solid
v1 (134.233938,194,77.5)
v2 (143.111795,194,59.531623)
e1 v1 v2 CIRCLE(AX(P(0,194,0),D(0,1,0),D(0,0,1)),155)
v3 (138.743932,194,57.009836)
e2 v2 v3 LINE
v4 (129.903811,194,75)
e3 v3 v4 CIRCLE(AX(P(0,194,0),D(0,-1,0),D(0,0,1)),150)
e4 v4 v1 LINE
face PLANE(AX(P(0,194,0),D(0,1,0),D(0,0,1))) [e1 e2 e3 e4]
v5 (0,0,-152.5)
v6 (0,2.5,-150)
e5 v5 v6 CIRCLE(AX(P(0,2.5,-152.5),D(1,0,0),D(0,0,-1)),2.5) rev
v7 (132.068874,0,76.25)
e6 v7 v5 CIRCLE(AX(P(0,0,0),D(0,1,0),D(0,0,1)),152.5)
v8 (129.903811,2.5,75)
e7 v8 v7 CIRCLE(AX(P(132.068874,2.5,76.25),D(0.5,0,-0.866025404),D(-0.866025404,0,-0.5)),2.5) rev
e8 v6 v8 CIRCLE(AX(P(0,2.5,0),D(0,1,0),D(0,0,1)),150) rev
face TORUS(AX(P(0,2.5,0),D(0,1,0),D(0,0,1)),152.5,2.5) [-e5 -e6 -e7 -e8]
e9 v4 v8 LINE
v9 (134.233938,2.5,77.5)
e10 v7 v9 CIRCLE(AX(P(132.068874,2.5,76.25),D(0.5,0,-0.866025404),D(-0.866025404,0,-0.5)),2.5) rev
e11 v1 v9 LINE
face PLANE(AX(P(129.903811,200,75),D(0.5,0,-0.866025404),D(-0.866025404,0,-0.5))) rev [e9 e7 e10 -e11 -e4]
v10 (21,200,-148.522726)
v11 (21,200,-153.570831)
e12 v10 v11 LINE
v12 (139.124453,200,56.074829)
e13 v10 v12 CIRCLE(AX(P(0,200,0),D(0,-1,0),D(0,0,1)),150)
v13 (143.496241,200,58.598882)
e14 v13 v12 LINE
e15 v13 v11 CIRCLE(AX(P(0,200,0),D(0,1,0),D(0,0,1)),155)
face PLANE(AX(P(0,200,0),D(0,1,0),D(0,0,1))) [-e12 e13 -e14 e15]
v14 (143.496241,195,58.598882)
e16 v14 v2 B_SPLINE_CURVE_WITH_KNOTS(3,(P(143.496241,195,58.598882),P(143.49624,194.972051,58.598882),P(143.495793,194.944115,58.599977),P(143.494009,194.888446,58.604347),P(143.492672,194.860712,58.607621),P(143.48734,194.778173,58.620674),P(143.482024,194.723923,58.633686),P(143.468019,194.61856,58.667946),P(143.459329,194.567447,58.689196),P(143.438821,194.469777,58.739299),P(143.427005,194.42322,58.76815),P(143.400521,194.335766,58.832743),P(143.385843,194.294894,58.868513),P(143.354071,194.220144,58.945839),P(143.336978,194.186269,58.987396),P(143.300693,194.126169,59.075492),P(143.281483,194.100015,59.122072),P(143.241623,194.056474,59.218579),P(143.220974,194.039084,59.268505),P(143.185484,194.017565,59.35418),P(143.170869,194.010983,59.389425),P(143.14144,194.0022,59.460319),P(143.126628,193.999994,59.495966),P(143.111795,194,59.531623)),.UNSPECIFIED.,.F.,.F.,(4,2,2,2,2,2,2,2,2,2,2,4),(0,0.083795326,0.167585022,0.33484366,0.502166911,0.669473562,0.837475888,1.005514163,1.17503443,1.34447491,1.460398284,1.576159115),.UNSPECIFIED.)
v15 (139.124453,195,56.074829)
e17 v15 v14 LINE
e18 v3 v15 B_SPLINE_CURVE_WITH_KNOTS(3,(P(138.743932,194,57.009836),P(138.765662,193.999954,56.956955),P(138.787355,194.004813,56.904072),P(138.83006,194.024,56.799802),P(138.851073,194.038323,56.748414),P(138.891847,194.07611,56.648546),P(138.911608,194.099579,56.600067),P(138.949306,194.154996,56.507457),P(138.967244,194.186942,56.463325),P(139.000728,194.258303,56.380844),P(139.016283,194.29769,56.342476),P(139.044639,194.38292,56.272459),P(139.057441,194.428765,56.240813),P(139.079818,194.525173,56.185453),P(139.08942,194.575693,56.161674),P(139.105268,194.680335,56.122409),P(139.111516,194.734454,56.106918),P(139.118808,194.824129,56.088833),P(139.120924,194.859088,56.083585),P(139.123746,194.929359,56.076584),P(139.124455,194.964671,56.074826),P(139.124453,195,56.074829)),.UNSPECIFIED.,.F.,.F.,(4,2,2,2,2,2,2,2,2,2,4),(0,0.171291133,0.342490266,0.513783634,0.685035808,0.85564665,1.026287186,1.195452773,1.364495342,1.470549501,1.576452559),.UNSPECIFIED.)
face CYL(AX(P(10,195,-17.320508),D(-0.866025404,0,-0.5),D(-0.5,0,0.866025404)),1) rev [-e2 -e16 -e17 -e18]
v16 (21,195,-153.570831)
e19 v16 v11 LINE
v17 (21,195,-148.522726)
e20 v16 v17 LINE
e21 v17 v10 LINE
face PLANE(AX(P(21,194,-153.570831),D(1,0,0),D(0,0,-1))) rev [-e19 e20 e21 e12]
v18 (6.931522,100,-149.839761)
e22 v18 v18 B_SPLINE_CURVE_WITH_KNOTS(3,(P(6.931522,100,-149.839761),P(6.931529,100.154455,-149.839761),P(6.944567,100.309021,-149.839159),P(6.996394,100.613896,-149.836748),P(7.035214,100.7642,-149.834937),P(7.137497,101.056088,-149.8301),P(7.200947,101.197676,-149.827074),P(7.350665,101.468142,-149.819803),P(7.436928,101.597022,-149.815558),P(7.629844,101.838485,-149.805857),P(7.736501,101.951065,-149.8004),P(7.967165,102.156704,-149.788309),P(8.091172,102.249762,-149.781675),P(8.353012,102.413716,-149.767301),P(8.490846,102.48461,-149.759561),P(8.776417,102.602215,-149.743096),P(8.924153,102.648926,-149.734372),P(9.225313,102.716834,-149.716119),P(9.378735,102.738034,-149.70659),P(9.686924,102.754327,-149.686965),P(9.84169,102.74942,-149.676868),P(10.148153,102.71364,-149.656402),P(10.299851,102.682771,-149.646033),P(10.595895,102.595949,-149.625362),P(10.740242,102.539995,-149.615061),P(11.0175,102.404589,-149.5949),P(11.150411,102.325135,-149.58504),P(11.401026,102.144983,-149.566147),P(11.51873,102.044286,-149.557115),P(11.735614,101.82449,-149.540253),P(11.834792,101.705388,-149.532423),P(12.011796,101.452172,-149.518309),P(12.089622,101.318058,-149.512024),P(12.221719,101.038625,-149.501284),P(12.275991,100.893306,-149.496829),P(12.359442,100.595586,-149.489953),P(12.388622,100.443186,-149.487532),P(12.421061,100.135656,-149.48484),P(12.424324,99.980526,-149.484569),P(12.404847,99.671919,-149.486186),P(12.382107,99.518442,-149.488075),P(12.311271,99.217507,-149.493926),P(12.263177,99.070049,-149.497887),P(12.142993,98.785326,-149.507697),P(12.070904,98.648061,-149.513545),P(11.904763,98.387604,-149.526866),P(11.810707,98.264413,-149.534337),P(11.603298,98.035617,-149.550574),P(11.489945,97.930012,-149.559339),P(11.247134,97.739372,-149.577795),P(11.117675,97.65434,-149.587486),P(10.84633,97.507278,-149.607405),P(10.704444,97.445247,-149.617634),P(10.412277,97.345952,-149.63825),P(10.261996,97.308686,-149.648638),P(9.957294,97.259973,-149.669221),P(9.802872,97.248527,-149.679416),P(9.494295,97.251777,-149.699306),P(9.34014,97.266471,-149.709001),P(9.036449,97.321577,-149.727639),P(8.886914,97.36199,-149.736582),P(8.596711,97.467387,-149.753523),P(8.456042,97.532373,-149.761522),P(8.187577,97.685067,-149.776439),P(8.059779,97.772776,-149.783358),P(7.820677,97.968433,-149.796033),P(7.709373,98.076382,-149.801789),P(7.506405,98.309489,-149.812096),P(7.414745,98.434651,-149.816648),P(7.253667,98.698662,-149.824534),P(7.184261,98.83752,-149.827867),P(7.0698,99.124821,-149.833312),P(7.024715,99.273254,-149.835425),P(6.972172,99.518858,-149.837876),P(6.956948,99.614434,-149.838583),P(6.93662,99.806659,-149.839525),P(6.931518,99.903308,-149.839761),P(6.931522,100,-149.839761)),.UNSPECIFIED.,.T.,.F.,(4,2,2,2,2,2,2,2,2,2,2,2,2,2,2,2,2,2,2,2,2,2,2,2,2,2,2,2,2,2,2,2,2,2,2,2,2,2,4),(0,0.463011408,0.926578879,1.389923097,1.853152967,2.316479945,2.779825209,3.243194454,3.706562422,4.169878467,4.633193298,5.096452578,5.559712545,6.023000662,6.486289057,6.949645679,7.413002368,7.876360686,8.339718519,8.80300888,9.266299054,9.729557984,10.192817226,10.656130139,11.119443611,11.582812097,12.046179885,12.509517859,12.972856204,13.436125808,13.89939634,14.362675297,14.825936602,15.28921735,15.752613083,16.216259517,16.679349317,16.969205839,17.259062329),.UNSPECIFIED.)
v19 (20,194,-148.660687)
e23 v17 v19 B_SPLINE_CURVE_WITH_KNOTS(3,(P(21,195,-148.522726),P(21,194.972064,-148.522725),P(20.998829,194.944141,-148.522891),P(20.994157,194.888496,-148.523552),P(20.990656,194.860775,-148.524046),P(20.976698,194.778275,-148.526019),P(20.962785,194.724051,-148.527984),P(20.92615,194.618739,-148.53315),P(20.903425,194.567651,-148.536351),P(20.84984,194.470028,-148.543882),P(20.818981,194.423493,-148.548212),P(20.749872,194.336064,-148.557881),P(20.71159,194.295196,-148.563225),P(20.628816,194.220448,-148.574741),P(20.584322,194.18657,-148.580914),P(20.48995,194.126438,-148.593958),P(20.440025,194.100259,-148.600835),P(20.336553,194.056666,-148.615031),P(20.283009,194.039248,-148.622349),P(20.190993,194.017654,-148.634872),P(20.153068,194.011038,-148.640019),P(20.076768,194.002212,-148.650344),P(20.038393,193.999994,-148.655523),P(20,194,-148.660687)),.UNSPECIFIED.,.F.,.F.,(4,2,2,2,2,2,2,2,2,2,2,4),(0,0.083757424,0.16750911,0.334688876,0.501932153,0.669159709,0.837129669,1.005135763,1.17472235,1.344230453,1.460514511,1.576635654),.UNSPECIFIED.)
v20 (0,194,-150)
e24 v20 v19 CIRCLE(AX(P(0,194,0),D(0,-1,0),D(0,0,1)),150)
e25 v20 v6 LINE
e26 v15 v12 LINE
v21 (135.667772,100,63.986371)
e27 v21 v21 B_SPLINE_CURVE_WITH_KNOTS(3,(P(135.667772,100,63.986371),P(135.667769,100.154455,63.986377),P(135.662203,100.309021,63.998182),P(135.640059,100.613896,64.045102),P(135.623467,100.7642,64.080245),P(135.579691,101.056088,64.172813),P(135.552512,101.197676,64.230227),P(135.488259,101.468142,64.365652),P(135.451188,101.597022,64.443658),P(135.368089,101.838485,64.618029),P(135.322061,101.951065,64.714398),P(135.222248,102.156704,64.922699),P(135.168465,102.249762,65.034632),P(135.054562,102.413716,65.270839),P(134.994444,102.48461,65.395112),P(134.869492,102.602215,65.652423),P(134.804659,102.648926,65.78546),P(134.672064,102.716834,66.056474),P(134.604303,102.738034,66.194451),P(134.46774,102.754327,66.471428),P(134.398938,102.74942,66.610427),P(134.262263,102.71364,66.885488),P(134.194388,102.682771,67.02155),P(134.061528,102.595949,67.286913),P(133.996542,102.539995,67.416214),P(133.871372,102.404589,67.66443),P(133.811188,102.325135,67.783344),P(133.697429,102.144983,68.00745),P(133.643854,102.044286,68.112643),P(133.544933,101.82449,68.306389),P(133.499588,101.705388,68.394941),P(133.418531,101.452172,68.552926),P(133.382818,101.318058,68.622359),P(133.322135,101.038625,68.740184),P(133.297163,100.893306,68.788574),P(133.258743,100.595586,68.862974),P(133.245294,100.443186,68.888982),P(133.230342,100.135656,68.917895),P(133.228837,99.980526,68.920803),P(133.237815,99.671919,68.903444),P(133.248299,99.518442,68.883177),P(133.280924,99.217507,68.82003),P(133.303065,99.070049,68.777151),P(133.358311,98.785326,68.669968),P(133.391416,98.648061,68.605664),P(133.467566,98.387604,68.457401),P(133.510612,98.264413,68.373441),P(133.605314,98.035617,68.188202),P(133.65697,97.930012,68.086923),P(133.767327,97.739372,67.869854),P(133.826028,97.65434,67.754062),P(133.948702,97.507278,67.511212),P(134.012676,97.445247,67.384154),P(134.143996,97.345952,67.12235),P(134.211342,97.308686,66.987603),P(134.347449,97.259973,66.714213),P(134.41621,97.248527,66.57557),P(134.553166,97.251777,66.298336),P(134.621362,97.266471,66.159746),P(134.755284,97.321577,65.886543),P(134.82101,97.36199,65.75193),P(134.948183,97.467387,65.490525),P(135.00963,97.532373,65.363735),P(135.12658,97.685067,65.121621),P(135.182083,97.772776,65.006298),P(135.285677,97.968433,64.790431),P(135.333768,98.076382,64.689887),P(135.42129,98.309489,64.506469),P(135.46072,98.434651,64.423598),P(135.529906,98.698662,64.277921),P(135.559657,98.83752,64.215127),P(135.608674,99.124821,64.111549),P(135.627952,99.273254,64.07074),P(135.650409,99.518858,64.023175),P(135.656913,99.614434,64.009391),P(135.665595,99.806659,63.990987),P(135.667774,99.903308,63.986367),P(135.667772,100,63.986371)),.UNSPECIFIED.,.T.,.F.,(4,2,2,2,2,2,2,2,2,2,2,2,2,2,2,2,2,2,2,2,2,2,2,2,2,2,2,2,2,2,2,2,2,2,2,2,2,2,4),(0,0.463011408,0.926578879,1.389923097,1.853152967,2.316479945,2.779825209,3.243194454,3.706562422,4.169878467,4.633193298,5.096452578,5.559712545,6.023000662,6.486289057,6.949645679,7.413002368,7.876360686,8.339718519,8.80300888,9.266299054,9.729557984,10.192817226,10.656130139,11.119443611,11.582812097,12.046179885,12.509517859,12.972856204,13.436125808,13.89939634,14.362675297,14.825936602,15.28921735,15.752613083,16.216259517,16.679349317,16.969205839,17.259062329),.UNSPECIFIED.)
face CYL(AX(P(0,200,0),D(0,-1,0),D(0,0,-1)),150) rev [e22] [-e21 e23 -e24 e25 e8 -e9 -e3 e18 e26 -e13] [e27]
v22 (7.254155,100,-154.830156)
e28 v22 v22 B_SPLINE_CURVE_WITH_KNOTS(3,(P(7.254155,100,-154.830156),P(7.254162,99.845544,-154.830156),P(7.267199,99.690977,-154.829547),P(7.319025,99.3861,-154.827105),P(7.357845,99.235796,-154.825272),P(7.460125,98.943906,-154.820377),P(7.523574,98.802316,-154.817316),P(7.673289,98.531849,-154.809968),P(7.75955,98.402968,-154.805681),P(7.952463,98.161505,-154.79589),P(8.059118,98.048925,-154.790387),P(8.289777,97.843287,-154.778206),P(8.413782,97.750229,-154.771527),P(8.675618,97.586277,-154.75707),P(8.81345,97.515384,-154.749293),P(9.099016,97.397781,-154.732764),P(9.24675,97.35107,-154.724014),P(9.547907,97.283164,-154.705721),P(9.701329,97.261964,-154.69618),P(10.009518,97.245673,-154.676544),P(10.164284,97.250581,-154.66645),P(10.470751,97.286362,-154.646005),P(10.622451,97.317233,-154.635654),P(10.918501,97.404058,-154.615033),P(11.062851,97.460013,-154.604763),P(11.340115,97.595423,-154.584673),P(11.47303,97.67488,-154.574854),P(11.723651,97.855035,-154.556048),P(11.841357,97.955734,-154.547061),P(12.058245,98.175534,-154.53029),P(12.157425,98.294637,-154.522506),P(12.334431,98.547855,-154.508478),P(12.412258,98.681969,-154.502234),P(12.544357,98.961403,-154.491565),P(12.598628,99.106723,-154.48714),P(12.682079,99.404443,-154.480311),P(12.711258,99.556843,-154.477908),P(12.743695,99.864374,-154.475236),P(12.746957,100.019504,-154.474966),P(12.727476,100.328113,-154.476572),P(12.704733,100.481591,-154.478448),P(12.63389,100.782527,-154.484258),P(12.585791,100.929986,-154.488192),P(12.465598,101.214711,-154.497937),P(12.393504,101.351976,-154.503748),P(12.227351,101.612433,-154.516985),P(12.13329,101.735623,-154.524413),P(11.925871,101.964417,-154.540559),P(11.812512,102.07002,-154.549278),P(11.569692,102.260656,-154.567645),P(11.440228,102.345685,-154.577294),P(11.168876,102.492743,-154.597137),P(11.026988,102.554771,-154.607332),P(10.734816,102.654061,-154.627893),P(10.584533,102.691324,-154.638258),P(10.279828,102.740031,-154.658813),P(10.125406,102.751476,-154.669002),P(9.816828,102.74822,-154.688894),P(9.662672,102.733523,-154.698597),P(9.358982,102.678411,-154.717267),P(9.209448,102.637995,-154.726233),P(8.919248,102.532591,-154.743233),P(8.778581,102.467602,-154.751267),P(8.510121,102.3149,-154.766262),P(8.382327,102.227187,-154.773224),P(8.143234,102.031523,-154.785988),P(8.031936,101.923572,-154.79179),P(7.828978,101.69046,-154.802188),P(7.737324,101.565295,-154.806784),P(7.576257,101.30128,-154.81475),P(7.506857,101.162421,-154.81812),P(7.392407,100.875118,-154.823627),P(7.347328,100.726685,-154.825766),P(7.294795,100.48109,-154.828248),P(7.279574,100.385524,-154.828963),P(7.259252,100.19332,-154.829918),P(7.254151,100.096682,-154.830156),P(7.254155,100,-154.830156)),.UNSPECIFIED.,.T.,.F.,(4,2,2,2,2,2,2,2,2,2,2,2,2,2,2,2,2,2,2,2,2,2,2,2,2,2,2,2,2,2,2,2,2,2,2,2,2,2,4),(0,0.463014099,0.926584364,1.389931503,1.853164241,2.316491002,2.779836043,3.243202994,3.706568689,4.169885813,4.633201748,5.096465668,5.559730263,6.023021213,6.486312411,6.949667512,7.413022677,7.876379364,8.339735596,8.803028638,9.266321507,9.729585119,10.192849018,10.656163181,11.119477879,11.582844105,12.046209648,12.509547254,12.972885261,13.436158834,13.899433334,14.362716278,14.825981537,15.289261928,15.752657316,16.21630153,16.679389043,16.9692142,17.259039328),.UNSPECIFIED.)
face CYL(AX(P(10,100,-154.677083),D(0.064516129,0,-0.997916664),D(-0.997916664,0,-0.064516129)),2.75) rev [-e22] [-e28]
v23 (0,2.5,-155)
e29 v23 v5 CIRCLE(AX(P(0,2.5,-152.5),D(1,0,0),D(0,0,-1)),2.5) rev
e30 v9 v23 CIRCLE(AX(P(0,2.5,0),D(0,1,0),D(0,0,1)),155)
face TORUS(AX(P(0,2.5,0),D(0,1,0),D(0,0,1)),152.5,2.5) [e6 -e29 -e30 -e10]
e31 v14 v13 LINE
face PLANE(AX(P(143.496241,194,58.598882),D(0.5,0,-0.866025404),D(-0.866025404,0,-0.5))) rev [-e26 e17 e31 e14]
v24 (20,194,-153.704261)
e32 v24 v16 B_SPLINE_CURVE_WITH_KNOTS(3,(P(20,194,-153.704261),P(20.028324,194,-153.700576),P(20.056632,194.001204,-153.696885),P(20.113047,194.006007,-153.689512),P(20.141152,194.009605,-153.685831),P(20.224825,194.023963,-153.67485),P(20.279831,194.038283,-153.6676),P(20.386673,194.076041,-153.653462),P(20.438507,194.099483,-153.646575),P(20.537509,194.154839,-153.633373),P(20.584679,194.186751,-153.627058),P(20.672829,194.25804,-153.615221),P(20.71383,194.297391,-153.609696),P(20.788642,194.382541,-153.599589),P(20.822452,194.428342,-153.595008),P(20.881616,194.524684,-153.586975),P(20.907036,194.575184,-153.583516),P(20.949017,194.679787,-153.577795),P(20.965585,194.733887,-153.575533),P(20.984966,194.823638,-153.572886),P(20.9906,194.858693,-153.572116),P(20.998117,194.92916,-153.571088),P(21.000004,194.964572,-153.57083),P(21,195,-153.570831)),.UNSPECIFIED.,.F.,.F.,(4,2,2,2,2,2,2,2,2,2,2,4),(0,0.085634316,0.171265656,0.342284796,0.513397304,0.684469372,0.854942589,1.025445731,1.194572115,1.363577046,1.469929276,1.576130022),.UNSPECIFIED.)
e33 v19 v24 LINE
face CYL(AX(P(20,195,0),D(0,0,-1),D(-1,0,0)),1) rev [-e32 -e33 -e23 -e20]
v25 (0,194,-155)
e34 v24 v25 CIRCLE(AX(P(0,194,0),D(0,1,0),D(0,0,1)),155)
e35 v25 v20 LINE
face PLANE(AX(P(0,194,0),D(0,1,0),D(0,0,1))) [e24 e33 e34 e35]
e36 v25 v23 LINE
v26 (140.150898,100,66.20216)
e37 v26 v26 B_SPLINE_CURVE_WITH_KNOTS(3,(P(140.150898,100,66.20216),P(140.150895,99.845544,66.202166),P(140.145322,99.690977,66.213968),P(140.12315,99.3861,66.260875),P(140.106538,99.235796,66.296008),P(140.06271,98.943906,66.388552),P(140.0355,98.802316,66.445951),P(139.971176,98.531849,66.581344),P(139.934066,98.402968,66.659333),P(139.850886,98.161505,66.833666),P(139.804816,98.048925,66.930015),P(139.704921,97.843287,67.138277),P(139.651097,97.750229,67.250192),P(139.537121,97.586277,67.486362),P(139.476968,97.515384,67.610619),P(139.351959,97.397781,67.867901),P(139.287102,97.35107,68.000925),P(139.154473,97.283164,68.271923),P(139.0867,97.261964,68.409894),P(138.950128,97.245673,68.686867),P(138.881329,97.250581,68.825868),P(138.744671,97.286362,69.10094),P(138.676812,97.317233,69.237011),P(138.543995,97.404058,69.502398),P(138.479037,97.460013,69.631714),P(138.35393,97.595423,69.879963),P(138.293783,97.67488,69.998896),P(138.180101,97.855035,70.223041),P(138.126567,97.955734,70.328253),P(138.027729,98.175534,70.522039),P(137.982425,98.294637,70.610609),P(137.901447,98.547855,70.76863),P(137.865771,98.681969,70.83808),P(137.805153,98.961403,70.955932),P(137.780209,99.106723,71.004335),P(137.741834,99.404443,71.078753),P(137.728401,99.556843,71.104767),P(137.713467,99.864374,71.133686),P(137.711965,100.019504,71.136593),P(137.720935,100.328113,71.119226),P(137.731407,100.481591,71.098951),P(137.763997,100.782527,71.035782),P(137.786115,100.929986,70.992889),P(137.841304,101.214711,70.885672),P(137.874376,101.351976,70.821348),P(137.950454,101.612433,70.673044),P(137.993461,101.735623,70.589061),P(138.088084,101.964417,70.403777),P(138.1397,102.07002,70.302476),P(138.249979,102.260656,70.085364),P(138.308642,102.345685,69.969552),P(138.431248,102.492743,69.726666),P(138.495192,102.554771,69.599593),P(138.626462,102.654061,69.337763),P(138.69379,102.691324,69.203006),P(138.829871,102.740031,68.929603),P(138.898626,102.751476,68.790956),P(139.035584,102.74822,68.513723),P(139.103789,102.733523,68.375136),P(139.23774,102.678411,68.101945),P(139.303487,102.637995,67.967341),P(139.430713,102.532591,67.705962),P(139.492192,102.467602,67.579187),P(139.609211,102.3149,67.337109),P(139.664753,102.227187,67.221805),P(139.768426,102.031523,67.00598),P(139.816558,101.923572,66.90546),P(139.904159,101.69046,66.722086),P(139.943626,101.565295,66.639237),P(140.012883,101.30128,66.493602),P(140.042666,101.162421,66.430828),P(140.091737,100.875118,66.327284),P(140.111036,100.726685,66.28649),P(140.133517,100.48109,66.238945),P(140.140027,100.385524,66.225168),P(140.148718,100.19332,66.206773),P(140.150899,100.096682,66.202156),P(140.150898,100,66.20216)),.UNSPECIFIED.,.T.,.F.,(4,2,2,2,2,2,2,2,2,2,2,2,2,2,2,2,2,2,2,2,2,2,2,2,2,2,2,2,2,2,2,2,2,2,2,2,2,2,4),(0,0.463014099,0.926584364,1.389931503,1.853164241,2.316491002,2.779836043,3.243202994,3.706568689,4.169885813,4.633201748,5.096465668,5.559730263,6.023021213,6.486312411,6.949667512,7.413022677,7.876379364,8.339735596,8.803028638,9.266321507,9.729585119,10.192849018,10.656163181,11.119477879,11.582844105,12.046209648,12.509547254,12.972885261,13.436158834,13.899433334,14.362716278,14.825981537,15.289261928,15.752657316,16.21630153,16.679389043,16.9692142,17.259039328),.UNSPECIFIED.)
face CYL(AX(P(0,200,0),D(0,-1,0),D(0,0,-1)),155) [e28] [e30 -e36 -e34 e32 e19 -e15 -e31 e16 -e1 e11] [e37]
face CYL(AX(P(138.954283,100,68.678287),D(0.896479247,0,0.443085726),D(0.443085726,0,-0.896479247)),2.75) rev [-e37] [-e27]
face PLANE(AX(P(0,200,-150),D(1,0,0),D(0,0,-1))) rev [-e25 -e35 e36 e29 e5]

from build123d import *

# Parameters (mm, degrees)
BOSS_EXTRUDE1_DEPTH            = 200
CUT_EXTRUDE1_START             = -6
CUT_EXTRUDE1_DEPTH             = 6
FILLET1_R                      = 1
FILLET2_R                      = 2.5
M5_CLEARANCE_HOLE1_D           = 5.5
M5_CLEARANCE_HOLE1_ON_FACE_2_D = 5.5


with BuildPart() as part:
    # Sketch1 → Boss-Extrude1 (new body)
    with BuildSketch(Plane(origin=(0, 0, 0), x_dir=(1, 0, 0), z_dir=(0, 1, 0))):
        with BuildLine():
            Line((0, 150), (0, 155))
            ThreePointArc((0, 155), (134.233937587, 77.5), (134.233937587, -77.5))
            Line((134.233937587, -77.5), (129.903810568, -75))
            ThreePointArc((129.903810568, -75), (129.903810568, 75), (0, 150))
        make_face()
    extrude(amount=BOSS_EXTRUDE1_DEPTH)

    # Sketch3 → Cut-Extrude1 (cut)
    with BuildSketch(Plane(origin=(0, 200, 0), x_dir=(1, 0, 0), z_dir=(0, 1, 0)).offset(CUT_EXTRUDE1_START)):
        with BuildLine():
            Line((21, 153.570830564), (21, 148.522725534))
            ThreePointArc((21, 148.522725534), (10.525948174, 149.630225606), (0, 150))
            Line((0, 150), (0, 155))
            ThreePointArc((0, 155), (10.524287687, 154.642294889), (21, 153.570830564))
        make_face()
        with BuildLine():
            Line((143.496240548, -58.598881802), (139.124453352, -56.074829287))
            ThreePointArc((139.124453352, -56.074829287), (134.846550636, -65.699374286), (129.903810568, -75))
            Line((129.903810568, -75), (134.233937587, -77.5))
            ThreePointArc((134.233937587, -77.5), (139.186299717, -68.206846951), (143.496240548, -58.598881802))
        make_face()
    extrude(amount=CUT_EXTRUDE1_DEPTH, mode=Mode.SUBTRACT)

    # Fillet1
    fillet1_edges = [part.edges().sort_by_distance(p)[0] for p in [
        (21, 194, -151.046778049),
        (141.31034695, 194, 57.336855545),
    ]]
    fillet(fillet1_edges, radius=FILLET1_R)

    # Fillet2
    fillet2_edges = [part.edges().sort_by_distance(p)[0] for p in [
        (134.233937587, 0, -77.5),
        (129.903810568, 0, -75),
    ]]
    fillet(fillet2_edges, radius=FILLET2_R - 0.0001)  # a hair under: the kernel refuses the full size

    # M5 Clearance Hole1 (through all)
    with Locations(Plane(origin=(138.954283246, 100, 68.678287453), x_dir=(-0.443085725506, 0, 0.89647924675), z_dir=(0.89647924675, 0, 0.443085725506))):
        with Locations((0, 0)):
            Hole(M5_CLEARANCE_HOLE1_D / 2)

    # M5 Clearance Hole1 on face 2 (through all)
    with Locations(Plane(origin=(10, 100, -154.677082983), x_dir=(-0.997916674108, 0, -0.064515978931), z_dir=(0.064515978931, 0, -0.997916674108))):
        with Locations((0, 0)):
            Hole(M5_CLEARANCE_HOLE1_ON_FACE_2_D / 2)


solid = part.part
